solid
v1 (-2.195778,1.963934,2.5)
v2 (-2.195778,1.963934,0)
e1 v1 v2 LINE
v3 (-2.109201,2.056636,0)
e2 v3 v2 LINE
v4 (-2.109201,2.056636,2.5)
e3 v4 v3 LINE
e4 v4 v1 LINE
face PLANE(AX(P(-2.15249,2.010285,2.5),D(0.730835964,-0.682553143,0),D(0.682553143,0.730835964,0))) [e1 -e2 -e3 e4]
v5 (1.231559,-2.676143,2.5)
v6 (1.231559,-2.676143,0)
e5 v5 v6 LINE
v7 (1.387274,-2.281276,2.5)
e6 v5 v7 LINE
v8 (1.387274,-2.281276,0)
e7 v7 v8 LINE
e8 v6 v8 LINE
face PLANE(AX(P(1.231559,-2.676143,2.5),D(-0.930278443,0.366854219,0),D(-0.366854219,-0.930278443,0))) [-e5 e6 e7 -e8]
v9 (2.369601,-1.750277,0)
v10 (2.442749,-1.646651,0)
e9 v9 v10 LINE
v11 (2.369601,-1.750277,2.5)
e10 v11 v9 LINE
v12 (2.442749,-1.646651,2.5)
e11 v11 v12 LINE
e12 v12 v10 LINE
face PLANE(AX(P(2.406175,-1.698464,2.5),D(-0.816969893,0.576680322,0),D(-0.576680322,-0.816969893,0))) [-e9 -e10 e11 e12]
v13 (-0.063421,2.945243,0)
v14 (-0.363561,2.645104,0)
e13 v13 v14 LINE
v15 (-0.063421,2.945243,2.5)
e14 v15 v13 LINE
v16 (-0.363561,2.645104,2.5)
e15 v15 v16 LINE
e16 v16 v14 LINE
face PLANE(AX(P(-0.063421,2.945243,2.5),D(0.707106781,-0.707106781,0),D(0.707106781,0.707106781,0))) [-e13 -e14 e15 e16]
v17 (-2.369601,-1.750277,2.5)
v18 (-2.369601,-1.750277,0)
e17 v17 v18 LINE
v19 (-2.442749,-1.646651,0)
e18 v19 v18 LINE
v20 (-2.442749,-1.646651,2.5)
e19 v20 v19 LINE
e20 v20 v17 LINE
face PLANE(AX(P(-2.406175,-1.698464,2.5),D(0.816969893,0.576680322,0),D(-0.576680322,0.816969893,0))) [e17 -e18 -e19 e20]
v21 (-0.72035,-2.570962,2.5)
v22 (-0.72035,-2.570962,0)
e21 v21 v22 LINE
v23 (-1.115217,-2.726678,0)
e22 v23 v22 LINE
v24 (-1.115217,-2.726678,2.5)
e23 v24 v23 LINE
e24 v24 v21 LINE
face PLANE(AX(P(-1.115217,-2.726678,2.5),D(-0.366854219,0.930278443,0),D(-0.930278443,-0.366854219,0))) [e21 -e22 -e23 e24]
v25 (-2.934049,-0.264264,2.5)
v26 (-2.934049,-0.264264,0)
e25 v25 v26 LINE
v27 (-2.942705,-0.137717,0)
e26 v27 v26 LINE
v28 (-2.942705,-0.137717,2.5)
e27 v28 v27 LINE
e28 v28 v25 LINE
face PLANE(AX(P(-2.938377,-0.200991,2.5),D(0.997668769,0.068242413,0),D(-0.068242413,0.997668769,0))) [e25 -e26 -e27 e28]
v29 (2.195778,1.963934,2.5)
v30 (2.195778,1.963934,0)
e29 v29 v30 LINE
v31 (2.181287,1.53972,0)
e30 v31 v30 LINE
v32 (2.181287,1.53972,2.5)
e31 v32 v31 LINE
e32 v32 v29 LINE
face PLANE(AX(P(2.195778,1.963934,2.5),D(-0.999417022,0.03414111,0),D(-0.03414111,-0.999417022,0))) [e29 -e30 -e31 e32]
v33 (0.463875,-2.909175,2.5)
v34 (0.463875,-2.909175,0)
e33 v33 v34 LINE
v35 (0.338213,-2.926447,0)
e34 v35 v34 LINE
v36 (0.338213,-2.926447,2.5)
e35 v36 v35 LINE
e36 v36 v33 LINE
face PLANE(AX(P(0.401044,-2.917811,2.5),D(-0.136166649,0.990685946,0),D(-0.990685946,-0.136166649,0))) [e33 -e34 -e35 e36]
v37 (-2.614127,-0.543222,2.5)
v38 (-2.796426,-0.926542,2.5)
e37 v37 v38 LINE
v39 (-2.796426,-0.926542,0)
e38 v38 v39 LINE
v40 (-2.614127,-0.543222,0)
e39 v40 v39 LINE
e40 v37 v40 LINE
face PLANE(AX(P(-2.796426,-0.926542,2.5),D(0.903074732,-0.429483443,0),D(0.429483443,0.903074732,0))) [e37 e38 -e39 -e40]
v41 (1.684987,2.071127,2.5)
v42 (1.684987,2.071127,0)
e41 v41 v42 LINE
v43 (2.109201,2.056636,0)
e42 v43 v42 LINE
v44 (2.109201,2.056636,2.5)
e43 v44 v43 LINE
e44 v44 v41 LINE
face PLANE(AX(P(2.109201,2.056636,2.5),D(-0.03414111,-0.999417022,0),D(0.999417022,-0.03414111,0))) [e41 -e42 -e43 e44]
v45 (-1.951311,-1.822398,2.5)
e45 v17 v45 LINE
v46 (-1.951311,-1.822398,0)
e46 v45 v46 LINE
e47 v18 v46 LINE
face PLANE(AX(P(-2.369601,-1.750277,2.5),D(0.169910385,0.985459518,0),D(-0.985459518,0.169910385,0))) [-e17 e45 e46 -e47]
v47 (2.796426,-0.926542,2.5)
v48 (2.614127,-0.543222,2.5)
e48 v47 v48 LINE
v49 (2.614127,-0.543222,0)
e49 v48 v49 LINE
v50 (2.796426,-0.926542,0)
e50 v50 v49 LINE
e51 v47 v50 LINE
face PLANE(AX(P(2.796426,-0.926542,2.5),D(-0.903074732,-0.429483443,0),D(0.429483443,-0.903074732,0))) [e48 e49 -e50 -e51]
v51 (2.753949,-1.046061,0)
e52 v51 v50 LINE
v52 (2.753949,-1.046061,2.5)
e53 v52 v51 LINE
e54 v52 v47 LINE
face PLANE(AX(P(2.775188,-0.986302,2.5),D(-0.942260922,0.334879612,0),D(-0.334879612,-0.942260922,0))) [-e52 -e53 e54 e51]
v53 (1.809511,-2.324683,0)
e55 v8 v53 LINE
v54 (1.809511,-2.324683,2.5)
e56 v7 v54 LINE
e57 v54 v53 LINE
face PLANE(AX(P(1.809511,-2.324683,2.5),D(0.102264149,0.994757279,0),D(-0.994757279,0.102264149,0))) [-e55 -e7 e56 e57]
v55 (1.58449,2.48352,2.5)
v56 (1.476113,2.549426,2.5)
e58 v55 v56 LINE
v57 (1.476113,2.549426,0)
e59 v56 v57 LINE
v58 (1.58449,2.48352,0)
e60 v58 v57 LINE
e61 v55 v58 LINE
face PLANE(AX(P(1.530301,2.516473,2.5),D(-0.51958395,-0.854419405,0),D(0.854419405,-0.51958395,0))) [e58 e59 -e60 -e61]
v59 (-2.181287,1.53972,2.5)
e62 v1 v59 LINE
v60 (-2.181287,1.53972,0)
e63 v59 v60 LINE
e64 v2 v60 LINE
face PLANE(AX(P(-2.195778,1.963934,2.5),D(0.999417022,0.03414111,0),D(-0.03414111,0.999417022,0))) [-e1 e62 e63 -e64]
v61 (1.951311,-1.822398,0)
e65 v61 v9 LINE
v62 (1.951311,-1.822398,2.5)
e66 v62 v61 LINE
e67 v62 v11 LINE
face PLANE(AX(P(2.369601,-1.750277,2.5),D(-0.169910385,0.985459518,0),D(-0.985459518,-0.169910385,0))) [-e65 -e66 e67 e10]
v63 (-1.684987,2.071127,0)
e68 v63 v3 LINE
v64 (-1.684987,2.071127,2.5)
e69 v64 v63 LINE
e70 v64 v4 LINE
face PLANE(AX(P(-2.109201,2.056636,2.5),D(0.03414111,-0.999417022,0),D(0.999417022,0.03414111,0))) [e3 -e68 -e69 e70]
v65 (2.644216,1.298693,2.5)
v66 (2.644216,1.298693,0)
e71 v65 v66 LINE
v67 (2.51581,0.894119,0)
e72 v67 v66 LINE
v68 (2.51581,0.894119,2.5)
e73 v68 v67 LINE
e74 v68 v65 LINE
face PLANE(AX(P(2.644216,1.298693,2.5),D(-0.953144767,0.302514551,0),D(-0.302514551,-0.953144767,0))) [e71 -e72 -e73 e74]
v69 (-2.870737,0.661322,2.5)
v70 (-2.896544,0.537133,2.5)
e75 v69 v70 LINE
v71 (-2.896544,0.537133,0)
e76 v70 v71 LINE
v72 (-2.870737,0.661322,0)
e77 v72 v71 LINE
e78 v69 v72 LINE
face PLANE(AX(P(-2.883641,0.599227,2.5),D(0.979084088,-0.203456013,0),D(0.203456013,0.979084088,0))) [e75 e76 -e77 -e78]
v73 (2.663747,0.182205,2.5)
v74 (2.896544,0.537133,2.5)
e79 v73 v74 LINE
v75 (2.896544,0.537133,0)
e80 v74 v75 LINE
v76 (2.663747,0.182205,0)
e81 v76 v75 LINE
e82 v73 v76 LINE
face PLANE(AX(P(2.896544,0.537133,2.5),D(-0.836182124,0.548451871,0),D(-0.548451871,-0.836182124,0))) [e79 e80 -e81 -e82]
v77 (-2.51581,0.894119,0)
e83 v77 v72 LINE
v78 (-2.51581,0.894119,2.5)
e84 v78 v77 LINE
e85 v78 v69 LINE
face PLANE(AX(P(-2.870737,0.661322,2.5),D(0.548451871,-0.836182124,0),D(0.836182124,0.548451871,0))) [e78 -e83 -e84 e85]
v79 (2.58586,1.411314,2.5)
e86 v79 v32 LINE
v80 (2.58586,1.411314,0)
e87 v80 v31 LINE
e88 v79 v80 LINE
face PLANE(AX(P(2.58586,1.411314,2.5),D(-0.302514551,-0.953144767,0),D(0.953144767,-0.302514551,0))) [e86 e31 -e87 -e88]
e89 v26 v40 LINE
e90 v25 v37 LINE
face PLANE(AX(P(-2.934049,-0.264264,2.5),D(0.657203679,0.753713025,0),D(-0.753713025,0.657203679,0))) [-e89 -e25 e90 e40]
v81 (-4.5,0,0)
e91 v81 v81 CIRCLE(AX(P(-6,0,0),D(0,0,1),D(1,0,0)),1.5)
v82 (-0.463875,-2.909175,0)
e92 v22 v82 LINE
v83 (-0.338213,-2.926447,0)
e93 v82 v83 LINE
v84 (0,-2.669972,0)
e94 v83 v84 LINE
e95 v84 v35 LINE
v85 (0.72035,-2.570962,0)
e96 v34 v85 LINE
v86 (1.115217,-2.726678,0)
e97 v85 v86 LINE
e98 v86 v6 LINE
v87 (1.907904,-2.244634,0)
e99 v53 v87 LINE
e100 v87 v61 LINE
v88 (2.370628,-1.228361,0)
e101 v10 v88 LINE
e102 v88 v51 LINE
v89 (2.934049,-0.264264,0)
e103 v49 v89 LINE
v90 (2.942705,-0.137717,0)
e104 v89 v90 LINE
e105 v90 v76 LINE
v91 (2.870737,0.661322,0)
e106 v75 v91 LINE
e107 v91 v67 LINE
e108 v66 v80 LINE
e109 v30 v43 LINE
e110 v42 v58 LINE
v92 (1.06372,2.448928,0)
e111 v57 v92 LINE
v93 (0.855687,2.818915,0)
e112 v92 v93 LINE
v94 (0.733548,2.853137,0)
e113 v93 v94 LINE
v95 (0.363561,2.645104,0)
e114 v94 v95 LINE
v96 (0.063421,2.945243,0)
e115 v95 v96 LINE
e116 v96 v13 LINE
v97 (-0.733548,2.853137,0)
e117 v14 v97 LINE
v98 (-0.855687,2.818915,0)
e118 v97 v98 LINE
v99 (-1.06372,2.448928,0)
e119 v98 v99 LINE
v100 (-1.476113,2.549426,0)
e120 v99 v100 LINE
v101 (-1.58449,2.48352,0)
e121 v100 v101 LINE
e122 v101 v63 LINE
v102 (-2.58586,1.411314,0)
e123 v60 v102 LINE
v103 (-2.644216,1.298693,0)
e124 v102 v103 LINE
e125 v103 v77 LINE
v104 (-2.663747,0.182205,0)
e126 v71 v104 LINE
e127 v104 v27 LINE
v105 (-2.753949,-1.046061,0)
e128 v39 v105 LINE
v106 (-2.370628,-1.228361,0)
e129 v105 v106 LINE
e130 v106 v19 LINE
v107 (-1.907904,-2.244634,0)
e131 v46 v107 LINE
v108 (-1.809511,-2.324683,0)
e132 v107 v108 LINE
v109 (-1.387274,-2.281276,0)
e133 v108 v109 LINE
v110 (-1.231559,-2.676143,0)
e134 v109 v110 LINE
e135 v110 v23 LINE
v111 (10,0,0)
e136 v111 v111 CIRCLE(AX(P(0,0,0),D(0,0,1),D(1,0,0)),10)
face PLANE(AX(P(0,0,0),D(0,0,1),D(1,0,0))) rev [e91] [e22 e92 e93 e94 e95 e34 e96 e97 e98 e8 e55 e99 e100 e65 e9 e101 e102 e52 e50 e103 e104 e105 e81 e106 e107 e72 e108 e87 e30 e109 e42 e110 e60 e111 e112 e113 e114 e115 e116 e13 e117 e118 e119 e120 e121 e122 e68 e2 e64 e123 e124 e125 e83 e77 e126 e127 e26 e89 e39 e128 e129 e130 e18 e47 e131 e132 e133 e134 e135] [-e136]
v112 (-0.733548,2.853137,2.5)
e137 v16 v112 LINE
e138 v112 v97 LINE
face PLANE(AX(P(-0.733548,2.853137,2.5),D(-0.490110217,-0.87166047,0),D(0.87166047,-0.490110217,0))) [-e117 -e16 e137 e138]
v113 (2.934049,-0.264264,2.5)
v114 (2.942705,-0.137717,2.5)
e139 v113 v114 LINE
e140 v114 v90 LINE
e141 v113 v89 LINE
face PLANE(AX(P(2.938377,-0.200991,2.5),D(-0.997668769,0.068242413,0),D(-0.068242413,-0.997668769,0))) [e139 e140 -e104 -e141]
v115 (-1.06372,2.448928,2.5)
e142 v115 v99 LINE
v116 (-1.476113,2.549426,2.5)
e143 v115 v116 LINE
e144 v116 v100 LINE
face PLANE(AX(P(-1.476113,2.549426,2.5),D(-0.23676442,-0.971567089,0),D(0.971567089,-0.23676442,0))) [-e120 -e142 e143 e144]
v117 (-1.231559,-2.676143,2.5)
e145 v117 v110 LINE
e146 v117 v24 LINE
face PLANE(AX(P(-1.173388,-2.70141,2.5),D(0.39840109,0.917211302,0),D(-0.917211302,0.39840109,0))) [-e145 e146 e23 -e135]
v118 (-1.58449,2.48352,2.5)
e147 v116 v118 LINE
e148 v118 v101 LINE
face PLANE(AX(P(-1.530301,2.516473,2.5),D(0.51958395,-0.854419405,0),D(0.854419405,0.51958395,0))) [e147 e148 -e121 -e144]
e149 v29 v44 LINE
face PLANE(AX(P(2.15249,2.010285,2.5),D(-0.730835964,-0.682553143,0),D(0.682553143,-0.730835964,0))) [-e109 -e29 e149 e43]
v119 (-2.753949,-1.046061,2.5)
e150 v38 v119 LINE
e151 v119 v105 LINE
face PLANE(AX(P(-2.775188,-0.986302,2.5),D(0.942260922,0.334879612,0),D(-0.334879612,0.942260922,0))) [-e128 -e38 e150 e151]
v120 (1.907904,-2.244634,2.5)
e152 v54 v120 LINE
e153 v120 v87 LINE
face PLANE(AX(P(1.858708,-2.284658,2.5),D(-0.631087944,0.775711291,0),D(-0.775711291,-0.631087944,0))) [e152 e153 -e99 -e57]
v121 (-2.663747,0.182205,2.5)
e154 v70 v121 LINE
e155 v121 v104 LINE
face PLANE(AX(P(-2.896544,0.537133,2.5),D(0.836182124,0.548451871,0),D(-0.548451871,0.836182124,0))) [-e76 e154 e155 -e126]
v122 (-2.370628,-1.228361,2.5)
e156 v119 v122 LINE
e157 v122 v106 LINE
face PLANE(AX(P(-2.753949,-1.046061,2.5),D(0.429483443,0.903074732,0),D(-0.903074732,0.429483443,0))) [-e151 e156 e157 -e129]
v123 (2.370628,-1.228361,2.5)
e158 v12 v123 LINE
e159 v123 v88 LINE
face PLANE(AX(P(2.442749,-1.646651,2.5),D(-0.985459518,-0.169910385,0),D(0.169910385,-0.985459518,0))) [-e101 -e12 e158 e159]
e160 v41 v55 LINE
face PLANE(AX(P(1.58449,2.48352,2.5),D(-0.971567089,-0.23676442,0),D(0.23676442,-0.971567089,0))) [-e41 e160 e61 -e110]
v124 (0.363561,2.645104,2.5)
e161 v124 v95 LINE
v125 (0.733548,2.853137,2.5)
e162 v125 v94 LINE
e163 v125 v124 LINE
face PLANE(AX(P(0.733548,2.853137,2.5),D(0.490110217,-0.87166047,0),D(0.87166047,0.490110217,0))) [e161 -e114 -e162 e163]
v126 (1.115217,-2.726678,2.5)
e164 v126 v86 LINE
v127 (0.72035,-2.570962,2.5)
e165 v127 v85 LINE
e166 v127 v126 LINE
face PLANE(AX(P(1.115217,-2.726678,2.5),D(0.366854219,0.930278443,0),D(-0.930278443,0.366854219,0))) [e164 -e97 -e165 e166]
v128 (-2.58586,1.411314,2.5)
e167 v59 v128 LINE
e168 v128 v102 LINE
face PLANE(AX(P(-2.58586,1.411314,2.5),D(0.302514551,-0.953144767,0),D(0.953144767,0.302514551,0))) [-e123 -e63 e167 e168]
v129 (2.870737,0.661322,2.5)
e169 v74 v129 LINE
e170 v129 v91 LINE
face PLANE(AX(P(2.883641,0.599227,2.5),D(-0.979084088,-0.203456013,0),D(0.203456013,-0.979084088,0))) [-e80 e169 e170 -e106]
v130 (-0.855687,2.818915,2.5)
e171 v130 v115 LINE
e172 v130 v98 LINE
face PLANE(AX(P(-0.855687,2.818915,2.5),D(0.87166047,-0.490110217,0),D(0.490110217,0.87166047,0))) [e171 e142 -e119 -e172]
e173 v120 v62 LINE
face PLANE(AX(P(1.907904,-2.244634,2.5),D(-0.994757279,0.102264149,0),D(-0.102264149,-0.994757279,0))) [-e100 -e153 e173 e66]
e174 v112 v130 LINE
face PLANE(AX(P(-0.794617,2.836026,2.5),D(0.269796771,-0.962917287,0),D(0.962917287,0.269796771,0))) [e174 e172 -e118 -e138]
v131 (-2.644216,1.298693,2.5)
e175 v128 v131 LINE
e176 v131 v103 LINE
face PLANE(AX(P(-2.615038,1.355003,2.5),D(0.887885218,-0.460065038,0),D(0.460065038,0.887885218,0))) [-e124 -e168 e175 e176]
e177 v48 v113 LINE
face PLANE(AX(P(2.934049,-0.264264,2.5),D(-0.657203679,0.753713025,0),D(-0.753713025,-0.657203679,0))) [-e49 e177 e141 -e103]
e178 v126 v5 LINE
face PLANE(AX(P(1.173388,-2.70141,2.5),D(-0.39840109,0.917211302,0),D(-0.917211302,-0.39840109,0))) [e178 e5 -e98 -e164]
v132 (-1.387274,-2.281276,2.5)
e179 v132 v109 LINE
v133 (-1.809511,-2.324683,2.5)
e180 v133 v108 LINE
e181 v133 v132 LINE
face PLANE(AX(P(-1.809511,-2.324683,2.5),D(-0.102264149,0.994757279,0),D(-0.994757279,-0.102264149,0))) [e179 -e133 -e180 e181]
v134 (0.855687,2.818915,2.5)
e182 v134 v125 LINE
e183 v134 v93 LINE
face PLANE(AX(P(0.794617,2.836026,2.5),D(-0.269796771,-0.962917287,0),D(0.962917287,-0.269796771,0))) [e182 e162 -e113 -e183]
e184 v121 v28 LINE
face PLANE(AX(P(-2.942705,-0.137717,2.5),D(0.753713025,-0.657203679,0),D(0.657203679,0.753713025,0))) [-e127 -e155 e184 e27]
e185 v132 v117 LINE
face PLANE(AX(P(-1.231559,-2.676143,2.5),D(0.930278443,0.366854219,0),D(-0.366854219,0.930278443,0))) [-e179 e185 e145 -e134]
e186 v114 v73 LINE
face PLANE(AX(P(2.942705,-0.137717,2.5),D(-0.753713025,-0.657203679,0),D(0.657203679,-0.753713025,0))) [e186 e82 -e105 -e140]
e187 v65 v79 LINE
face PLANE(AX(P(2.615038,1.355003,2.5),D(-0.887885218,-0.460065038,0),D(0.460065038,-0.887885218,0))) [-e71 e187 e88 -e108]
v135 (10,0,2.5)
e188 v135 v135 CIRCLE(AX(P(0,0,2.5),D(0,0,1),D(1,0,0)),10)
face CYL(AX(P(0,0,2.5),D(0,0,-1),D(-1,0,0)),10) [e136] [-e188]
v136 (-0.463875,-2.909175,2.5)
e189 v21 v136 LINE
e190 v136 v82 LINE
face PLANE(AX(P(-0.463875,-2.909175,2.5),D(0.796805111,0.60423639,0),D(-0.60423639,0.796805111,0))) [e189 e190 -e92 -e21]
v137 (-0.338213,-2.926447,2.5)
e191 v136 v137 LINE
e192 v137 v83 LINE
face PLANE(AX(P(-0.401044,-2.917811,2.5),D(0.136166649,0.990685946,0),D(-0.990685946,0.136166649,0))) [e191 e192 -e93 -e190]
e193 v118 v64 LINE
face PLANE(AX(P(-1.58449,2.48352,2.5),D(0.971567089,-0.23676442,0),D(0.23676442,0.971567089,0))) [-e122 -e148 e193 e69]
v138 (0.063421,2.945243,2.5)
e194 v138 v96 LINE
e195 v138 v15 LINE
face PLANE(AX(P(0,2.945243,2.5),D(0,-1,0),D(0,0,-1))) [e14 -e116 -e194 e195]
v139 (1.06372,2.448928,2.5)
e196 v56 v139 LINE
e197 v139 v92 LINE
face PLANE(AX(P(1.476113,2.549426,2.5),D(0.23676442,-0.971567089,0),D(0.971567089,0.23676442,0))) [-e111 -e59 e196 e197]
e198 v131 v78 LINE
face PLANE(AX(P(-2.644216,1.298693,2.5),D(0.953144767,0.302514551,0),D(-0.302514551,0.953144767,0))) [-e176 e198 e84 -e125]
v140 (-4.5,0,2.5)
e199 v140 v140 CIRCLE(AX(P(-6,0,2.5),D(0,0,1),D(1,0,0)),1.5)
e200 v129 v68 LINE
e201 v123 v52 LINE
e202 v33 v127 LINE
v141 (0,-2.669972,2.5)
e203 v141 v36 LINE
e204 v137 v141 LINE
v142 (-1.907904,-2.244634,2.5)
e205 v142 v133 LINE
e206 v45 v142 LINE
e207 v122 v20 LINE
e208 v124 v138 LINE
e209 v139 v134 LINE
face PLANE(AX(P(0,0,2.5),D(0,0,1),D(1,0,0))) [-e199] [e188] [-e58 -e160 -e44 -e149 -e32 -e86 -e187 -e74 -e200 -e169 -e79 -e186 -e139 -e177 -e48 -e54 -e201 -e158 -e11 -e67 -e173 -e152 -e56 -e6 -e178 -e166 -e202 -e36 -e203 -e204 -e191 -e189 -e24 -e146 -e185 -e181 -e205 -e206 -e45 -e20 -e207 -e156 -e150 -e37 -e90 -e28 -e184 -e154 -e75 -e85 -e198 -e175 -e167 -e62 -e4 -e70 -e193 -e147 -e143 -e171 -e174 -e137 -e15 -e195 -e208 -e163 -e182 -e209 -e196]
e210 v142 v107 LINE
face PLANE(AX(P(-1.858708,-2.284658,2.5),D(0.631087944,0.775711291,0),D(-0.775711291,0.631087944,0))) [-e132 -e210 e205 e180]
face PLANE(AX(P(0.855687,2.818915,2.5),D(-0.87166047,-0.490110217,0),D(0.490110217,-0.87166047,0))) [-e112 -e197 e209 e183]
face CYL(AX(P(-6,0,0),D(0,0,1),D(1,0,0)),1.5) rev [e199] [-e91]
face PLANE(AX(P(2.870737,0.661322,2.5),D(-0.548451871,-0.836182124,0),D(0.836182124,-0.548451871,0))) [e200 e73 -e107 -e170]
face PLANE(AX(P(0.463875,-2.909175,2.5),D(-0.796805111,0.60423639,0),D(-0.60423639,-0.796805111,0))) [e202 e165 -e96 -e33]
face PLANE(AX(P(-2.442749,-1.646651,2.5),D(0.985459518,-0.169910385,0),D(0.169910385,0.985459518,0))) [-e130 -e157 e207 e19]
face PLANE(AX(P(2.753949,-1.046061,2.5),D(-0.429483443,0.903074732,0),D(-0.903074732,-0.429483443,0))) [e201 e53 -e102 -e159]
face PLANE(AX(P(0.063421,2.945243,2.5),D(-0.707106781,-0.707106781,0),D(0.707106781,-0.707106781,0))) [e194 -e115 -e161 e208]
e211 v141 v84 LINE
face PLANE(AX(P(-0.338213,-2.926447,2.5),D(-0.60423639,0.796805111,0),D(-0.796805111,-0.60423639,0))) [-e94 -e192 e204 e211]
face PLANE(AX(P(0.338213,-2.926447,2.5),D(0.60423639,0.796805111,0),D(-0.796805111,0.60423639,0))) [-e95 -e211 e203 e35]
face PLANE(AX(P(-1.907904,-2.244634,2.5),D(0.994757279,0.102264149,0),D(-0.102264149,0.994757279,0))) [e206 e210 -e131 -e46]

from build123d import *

# Parameters (mm, degrees)
SKETCH1_R              = 10
BOSS_EXTRUDE1_DEPTH    = 2.5
CUT_EXTRUDE1_OUTLINE_R = 1.5
CUT_EXTRUDE1_DEPTH     = 2.5


# Read off the part's stored shape, not the designer's step: Cut-Extrude1
with BuildPart() as part:
    # Sketch1 → Boss-Extrude1 (new body)
    with BuildSketch(Plane.XY):
        Circle(SKETCH1_R)
        Polygon((-2.644215925, 1.298692578), (-2.51581008, 0.894119117), (-2.870737377, 0.661322297), (-2.883640833, 0.599227456), (-2.896544289, 0.537132615), (-2.663747469, 0.182205319), (-2.942705268, -0.137717003), (-2.938377242, -0.20099051), (-2.934049215, -0.264264016), (-2.614126893, -0.543221815), (-2.796426171, -0.926542463), (-2.775187652, -0.986301929), (-2.753949133, -1.046061394), (-2.370628485, -1.228360672), (-2.442748938, -1.646650507), (-2.40617509, -1.698463845), (-2.369601242, -1.750277184), (-1.951311407, -1.822397637), (-1.907904191, -2.244634016), (-1.858707529, -2.284658469), (-1.809510867, -2.324682922), (-1.387274489, -2.281275706), (-1.231558919, -2.676143288), (-1.173388134, -2.701410425), (-1.115217349, -2.726677563), (-0.720349768, -2.570961993), (-0.463874555, -2.909175255), (-0.401043909, -2.917811129), (-0.338213262, -2.926447002), (0, -2.669971789), (0.338213262, -2.926447002), (0.401043909, -2.917811129), (0.463874555, -2.909175255), (0.720349768, -2.570961993), (1.115217349, -2.726677563), (1.173388134, -2.701410425), (1.231558919, -2.676143288), (1.387274489, -2.281275706), (1.809510867, -2.324682922), (1.858707529, -2.284658469), (1.907904191, -2.244634016), (1.951311407, -1.822397637), (2.369601242, -1.750277184), (2.40617509, -1.698463845), (2.442748938, -1.646650507), (2.370628485, -1.228360672), (2.753949133, -1.046061394), (2.775187652, -0.986301929), (2.796426171, -0.926542463), (2.614126893, -0.543221815), (2.934049215, -0.264264016), (2.938377242, -0.20099051), (2.942705268, -0.137717003), (2.663747469, 0.182205319), (2.896544289, 0.537132615), (2.883640833, 0.599227456), (2.870737377, 0.661322297), (2.51581008, 0.894119117), (2.644215925, 1.298692578), (2.615037976, 1.355003462), (2.585860027, 1.411314347), (2.181286567, 1.539720192), (2.195778161, 1.963934453), (2.152489715, 2.010285061), (2.109201269, 2.056635669), (1.684987008, 2.071127263), (1.584489576, 2.483520294), (1.530301139, 2.516473013), (1.476112702, 2.549425731), (1.063719671, 2.4489283), (0.855686648, 2.818914796), (0.794617128, 2.836025673), (0.733547608, 2.85313655), (0.363561112, 2.645103528), (0.063421356, 2.945243283), (0, 2.945243283), (-0.063421356, 2.945243283), (-0.363561112, 2.645103528), (-0.733547608, 2.85313655), (-0.794617128, 2.836025673), (-0.855686648, 2.818914796), (-1.063719671, 2.4489283), (-1.476112702, 2.549425731), (-1.530301139, 2.516473013), (-1.584489576, 2.483520294), (-1.684987008, 2.071127263), (-2.109201269, 2.056635669), (-2.152489715, 2.010285061), (-2.195778161, 1.963934453), (-2.181286567, 1.539720192), (-2.585860027, 1.411314347), (-2.615037976, 1.355003462), align=None, mode=Mode.SUBTRACT)
    extrude(amount=BOSS_EXTRUDE1_DEPTH)

    # Cut-Extrude1 outline → Cut-Extrude1 (cut)
    with BuildSketch(Plane.XY):
        with Locations((-6, 0)):
            Circle(CUT_EXTRUDE1_OUTLINE_R)
    extrude(amount=CUT_EXTRUDE1_DEPTH, mode=Mode.SUBTRACT)


solid = part.part
